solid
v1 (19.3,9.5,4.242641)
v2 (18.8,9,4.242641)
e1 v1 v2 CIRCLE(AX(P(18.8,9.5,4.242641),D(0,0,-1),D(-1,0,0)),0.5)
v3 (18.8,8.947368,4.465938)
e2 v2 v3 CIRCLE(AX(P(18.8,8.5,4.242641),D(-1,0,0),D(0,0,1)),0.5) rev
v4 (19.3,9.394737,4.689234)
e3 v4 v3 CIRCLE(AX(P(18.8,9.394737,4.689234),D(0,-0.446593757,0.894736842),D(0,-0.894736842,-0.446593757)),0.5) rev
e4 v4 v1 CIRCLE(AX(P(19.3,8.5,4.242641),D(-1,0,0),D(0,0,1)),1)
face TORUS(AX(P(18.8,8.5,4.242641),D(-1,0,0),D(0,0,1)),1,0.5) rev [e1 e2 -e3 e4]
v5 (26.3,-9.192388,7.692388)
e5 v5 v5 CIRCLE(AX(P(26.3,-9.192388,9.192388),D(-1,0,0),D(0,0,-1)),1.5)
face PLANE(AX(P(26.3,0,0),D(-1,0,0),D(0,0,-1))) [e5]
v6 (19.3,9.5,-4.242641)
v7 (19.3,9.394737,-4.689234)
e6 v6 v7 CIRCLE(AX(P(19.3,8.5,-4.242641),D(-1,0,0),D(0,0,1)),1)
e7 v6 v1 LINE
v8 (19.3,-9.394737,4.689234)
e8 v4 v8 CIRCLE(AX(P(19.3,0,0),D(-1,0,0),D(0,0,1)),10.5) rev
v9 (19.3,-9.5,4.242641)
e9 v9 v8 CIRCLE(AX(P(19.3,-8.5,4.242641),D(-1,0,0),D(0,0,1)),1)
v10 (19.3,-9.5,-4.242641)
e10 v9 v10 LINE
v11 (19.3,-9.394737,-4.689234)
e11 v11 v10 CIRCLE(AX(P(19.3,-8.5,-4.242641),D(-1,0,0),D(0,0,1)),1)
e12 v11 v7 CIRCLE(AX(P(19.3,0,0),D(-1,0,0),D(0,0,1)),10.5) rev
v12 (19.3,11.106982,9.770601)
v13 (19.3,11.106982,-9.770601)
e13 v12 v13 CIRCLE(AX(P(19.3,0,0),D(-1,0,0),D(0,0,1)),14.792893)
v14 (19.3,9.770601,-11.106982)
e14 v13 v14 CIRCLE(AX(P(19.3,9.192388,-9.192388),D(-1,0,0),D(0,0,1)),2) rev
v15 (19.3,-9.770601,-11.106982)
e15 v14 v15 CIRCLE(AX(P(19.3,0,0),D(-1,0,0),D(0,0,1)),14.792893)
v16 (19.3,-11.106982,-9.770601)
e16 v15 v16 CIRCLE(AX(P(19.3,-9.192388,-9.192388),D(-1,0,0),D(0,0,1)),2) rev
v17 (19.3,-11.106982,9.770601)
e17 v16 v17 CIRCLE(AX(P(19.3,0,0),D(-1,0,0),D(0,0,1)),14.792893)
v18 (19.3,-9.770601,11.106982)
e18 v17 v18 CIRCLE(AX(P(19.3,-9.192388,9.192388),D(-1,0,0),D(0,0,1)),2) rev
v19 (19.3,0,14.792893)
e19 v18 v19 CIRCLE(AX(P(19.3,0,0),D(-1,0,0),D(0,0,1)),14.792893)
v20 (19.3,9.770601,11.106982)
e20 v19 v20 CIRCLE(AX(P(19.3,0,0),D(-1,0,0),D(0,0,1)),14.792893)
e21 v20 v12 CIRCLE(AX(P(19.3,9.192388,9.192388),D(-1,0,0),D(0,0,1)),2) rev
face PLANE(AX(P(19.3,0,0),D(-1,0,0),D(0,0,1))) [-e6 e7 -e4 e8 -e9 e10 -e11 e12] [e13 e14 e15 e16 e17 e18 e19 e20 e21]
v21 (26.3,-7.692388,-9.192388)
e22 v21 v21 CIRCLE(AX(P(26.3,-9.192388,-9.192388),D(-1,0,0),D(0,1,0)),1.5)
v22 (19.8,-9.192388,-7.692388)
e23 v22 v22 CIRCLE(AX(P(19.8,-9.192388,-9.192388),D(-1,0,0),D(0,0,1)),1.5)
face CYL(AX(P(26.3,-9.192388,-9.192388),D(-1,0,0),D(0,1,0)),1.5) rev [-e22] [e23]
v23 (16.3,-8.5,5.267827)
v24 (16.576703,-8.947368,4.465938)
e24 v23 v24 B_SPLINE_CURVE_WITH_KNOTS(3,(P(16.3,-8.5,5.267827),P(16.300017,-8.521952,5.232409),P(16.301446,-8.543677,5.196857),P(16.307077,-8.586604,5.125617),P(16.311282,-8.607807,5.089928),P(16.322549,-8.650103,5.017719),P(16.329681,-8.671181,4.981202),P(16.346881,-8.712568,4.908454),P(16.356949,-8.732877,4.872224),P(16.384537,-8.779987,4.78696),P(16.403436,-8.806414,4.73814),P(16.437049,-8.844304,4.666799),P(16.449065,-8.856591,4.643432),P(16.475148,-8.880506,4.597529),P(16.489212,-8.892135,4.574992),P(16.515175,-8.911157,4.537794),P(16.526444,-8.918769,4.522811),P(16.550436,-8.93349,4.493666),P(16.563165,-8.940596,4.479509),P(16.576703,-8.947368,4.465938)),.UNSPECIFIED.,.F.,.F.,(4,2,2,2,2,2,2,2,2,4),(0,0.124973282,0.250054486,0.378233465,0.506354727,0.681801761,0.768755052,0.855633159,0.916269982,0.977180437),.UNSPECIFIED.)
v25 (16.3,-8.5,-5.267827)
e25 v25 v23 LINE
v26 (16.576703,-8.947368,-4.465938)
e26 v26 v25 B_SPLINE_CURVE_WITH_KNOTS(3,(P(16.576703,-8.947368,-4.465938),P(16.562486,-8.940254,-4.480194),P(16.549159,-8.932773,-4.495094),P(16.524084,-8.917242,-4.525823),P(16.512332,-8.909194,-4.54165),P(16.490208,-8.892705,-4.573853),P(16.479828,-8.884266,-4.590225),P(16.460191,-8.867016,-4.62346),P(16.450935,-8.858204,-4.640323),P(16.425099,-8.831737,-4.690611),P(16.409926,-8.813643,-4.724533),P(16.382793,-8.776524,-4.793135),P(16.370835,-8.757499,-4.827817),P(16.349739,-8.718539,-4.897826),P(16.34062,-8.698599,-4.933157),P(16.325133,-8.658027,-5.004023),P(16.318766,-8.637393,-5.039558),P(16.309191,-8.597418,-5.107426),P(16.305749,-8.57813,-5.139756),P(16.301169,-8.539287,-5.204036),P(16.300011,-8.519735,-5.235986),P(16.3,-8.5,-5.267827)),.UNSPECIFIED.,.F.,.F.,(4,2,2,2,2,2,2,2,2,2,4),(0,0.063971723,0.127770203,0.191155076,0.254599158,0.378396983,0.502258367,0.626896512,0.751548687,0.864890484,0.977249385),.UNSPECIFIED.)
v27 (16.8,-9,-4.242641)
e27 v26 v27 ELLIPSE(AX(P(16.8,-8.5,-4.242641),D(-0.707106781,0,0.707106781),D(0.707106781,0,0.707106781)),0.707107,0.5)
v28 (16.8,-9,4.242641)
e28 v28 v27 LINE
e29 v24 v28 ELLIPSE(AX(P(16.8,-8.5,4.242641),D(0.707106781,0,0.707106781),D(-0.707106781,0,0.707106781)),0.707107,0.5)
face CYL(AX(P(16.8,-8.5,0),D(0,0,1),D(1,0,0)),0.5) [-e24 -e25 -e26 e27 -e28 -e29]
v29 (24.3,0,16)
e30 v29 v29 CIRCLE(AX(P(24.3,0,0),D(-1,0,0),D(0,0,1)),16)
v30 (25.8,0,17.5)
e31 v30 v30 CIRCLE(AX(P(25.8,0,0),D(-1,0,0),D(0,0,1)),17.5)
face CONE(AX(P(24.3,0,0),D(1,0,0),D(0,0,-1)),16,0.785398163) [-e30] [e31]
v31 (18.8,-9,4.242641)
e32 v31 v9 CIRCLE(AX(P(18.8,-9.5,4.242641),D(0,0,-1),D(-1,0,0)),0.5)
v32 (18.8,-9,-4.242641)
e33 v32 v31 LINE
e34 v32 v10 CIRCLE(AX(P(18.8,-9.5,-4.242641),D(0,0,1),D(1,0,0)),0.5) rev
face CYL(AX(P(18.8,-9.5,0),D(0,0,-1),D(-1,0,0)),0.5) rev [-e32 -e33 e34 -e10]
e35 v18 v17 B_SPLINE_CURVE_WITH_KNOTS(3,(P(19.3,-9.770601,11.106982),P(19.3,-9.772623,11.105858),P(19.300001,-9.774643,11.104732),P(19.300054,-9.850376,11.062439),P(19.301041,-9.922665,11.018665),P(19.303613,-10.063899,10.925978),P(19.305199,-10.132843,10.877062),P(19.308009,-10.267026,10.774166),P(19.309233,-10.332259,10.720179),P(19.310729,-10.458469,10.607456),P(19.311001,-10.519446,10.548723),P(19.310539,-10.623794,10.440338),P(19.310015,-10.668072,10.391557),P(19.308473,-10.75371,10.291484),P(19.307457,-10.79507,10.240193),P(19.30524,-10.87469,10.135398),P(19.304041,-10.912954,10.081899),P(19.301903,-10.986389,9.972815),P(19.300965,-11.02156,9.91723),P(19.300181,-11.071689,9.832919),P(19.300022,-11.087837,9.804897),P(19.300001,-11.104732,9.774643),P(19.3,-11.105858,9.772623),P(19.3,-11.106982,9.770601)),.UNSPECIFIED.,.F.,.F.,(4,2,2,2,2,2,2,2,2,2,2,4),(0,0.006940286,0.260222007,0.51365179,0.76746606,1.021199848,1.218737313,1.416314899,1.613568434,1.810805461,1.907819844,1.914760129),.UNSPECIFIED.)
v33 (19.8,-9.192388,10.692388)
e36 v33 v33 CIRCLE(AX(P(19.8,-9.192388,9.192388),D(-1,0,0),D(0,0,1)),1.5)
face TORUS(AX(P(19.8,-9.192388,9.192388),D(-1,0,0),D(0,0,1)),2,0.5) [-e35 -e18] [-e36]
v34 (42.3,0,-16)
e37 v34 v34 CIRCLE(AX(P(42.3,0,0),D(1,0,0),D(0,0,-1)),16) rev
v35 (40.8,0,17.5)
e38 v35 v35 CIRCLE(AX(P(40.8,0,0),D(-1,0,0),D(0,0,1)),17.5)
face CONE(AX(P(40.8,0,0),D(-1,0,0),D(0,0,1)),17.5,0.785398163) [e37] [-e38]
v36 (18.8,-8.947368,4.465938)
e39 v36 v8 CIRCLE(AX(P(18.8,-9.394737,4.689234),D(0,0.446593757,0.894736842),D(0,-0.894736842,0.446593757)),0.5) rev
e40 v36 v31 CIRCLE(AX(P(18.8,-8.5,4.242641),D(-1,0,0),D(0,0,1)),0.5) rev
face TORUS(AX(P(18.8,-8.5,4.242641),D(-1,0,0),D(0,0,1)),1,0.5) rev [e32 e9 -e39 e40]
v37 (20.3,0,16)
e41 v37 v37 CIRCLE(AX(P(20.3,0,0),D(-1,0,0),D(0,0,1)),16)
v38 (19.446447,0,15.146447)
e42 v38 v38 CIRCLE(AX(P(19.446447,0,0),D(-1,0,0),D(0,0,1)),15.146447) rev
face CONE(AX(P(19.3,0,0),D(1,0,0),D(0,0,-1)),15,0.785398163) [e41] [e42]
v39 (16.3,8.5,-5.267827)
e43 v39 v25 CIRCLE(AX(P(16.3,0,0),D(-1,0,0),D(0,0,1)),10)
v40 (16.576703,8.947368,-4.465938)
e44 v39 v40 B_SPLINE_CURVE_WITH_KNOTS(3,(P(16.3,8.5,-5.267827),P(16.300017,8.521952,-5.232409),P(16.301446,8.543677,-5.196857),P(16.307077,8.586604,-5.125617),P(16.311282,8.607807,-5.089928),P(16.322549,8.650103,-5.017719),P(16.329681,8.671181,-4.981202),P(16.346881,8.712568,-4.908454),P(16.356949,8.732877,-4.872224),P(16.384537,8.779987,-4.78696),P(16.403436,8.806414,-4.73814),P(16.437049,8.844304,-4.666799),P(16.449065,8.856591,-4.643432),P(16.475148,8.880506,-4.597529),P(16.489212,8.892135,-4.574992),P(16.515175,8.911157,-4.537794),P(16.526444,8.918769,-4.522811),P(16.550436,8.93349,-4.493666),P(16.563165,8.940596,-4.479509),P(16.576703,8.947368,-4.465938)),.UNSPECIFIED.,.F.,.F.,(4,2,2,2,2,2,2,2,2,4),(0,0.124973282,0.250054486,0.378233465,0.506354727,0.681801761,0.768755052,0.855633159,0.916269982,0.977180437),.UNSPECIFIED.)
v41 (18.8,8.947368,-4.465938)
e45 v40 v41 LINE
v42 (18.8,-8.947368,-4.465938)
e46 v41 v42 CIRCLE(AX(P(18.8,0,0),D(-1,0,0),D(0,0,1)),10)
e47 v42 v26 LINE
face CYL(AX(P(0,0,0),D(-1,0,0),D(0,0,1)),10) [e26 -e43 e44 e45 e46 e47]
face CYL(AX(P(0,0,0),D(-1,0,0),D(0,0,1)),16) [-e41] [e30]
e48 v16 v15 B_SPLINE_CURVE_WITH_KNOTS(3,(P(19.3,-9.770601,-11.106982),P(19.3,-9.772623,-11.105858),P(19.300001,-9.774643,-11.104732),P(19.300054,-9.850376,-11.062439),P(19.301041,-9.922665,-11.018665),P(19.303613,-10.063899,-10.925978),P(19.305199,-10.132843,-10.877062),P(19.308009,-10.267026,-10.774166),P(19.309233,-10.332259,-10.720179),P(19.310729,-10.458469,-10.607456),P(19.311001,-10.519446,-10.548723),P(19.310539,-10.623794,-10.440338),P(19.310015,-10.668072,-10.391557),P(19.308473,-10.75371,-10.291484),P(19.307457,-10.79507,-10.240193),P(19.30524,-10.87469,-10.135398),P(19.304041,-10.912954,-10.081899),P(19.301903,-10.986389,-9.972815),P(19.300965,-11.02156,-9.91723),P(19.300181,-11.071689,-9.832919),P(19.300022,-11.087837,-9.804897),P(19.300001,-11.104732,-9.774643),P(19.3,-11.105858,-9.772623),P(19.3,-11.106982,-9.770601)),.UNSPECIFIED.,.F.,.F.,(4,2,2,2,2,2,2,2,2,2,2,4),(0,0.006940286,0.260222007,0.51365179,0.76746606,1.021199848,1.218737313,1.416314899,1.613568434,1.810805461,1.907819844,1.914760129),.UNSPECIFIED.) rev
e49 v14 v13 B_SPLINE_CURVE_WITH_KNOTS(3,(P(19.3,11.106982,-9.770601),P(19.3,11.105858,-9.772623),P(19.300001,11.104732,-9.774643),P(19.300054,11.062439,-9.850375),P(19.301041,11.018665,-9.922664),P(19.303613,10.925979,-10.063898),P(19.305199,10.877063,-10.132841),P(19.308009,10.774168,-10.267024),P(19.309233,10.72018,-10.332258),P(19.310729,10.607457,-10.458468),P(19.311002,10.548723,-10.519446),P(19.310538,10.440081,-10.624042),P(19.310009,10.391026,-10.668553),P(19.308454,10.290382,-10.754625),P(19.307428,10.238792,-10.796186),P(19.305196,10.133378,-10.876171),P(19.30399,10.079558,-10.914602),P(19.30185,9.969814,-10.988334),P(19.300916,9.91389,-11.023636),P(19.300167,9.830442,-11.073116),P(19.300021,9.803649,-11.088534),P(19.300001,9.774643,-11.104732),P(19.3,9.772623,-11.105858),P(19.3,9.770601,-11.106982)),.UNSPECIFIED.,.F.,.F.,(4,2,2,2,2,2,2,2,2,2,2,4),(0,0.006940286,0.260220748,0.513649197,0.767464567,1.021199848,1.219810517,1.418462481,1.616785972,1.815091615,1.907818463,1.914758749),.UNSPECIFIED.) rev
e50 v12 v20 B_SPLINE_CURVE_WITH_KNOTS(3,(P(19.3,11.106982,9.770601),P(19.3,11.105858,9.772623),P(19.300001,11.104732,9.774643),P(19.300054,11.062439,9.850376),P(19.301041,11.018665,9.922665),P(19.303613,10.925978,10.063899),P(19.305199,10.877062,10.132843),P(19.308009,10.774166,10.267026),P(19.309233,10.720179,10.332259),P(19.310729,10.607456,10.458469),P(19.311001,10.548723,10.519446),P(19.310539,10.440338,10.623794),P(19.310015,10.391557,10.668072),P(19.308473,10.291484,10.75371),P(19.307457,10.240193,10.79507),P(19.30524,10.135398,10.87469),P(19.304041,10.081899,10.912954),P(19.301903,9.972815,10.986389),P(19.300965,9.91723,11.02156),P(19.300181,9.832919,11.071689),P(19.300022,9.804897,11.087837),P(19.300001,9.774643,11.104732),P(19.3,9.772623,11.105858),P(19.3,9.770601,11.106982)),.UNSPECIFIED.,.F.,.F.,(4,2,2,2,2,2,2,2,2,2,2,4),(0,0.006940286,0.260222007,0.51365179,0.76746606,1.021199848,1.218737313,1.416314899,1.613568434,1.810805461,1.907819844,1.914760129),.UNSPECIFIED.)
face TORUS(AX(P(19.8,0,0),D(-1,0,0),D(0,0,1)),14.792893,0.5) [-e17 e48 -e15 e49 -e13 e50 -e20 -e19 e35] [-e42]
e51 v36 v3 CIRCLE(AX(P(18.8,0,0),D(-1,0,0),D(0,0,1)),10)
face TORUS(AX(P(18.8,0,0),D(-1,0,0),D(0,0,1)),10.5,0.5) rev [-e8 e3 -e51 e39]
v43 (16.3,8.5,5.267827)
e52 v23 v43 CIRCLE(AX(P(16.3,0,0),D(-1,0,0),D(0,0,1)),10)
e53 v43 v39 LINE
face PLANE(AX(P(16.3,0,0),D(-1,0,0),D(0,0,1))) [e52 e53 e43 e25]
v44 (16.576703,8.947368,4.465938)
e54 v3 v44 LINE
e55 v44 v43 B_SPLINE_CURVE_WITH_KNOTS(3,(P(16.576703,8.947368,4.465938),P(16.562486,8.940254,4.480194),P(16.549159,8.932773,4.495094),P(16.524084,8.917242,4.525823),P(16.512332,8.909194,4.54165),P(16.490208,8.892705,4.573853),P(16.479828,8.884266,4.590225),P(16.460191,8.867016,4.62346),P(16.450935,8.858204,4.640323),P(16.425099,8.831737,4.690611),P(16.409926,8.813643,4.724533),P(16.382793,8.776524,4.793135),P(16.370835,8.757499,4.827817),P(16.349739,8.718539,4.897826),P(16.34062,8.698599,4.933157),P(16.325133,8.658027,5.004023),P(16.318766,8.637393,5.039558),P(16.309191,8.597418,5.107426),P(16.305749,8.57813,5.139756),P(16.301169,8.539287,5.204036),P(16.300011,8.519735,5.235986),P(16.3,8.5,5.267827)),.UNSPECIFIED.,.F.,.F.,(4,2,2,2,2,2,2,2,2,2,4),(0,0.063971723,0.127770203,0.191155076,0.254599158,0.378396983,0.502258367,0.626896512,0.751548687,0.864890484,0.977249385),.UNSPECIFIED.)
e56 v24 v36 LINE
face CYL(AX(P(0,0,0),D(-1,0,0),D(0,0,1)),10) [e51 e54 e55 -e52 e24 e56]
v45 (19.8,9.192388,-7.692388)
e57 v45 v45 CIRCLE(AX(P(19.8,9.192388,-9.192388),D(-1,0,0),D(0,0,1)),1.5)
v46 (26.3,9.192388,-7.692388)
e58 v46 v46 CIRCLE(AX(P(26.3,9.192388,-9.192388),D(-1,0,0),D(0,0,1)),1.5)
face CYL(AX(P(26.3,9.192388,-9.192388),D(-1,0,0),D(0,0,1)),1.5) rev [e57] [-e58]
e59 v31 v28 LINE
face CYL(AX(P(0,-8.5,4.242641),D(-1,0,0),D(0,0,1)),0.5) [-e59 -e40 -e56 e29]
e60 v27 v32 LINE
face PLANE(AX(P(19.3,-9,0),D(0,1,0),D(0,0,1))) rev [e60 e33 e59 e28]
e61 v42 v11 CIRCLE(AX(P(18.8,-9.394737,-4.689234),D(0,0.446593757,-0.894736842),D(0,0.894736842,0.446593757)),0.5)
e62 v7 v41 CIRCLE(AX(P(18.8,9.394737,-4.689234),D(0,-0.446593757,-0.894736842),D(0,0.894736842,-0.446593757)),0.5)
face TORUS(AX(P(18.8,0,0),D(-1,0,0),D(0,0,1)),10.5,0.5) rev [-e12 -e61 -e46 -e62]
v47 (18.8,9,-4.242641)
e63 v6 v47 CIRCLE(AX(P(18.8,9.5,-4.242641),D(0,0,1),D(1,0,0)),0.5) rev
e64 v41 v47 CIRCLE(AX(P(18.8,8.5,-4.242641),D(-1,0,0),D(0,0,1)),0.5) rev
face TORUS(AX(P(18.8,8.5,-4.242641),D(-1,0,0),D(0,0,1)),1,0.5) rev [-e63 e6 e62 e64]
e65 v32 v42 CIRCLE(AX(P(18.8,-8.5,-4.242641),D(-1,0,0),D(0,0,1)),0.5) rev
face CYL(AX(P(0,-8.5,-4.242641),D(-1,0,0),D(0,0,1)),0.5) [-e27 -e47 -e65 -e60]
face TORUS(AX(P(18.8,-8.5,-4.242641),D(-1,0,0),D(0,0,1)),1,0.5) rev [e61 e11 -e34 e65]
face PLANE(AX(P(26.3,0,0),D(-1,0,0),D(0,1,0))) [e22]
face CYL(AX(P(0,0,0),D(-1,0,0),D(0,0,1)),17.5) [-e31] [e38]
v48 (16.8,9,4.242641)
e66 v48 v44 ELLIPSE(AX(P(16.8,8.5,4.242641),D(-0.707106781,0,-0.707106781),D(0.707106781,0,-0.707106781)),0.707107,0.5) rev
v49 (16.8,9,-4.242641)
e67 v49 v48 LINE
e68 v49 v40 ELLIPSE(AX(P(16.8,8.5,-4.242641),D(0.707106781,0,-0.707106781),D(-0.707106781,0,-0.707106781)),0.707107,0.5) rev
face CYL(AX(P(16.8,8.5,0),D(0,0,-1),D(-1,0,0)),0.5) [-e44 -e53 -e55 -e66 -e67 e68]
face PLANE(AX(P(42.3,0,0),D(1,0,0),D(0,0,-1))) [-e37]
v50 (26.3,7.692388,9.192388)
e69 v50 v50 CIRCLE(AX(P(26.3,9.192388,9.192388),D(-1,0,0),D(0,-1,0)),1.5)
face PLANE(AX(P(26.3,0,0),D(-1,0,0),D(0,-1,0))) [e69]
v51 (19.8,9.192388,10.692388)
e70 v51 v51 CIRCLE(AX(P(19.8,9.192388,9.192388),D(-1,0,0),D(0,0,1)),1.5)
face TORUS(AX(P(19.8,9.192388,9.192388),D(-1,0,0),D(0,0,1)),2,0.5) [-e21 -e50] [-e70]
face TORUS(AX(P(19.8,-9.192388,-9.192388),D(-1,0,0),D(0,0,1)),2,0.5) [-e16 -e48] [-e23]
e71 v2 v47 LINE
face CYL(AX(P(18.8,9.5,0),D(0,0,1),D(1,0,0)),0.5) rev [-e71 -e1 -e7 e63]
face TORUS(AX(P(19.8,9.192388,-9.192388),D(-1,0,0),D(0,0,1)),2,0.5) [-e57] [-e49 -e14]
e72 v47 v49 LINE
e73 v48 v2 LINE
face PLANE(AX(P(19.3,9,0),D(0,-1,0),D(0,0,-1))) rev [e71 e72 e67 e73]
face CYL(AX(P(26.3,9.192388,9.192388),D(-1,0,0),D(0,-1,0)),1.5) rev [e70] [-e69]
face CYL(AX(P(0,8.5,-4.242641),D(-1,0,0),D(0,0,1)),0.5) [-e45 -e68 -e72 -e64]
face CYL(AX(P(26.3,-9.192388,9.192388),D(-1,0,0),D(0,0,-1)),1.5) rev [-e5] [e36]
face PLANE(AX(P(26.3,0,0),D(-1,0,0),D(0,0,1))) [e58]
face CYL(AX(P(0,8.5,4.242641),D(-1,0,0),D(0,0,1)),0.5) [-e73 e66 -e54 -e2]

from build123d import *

# Parameters (mm, degrees)
SKETCH_1_W               = 16.3
SKETCH_1_H               = 3
SKETCH_1_W_2             = 5
SKETCH_1_H_2             = 16
SKETCH_19_W              = 3
SKETCH_19_H              = 0.05
EXTRUDE_START            = 14
SKETCH_20_R              = 18
EXTRUDE_2_DEPTH          = 14
CUT_EXTRUDE_6_DEPTH      = 3
CUT_EXTRUDE_4_DEPTH      = 12
SKETCH_13_R              = 1.5
CUT_EXTRUDE_8_DEPTH      = 7
PATTERN_CIRCULAR_2_COUNT = 4
FILLET_1_R               = 0.5
SKETCH_21_R              = 20
CUT_EXTRUDE_7_DEPTH      = 76
SKETCH_23_R              = 3
CUT_EXTRUDE_8_2_DEPTH    = 16.3


with BuildPart() as part:
    # Эскиз1 → Повернуть1 основной корпус (revolve)
    with BuildSketch(Plane(origin=(0, 0, 0), x_dir=(1, 0, 0), z_dir=(0, 1, 0)), mode=Mode.PRIVATE) as revolve_1_sk:
        with Locations((8.15, 1.5)):
            Rectangle(SKETCH_1_W, SKETCH_1_H)
        Polygon((16.3, 0), (19.3, 0), (19.3, 10), (16.3, 10), (16.3, 3), align=None)
        Polygon((24.3, 0), (24.3, 16), (20.3, 16), (19.3, 15), (19.3, 10), (19.3, 0), align=None)
        Polygon((40.8, 17.5), (42.3, 16), (42.3, 0), (24.3, 0), (24.3, 16), (25.8, 17.5), align=None)
        with Locations((44.8, 8)):
            Rectangle(SKETCH_1_W_2, SKETCH_1_H_2)
        with BuildLine():
            ThreePointArc((47.3, 16), (47.885786438, 17.414213562), (49.3, 18))
            Line((49.3, 18), (104.3, 18))
            Line((104.3, 18), (104.3, 0))
            Line((104.3, 0), (47.3, 0))
            Line((47.3, 0), (47.3, 16))
        make_face()
    revolve(revolve_1_sk.sketch.rotate(Axis((0, 0, 0), (1, 0, 0)), 180), axis=Axis((0, 0, 0), (1, 0, 0)))

    # Эскиз19 → Вырез-Повернуть2 пластиковая часть (revolve, cut)
    with BuildSketch(Plane(origin=(0, 0, 0), x_dir=(1, 0, 0), z_dir=(0, 1, 0)), mode=Mode.PRIVATE) as cut_revolve_2_sk:
        with Locations((102.8, 17.975)):
            Rectangle(SKETCH_19_W, SKETCH_19_H)
    revolve(cut_revolve_2_sk.sketch.rotate(Axis((103.004702911, 0, 0), (-1, 0, 0)), 180), axis=Axis((103.004702911, 0, 0), (-1, 0, 0)), mode=Mode.SUBTRACT)

    # Эскиз20 → Бобышка-Вытянуть2 пластиковая крышка контактов (add)
    with BuildSketch(Plane(origin=(104.3, 0, 0), x_dir=(0, 0, -1), z_dir=(1, 0, 0)).offset(EXTRUDE_START)):
        with Locations(Location((0, 0, 0), (0, 0, 180))):
            Circle(SKETCH_20_R)
    extrude(amount=-EXTRUDE_2_DEPTH)

    # Эскиз11 → Вырез-Вытянуть6 (cut)
    with BuildSketch(Plane.ZY.offset(-16.3)):
        with BuildLine():
            ThreePointArc((4.358898944, 9), (0, 10), (-4.358898944, 9))
            Line((-4.358898944, 9), (4.358898944, 9))
        make_face()
        with BuildLine():
            Line((4.358898944, -9), (-4.358898944, -9))
            ThreePointArc((-4.358898944, -9), (0, -10), (4.358898944, -9))
        make_face()
    extrude(amount=-CUT_EXTRUDE_6_DEPTH, mode=Mode.SUBTRACT)

    # Эскиз6 → Вырез-Вытянуть4 на оси (cut)
    with BuildSketch(Plane.ZY):
        with BuildLine():
            Line((-1.75306936, 2.434491286), (1.561110291, 2.561822527))
            ThreePointArc((1.561110291, 2.561822527), (-0.115175441, 2.997788288), (-1.75306936, 2.434491286))
        make_face()
    extrude(amount=-CUT_EXTRUDE_4_DEPTH, mode=Mode.SUBTRACT)

    # Эскиз13 → Cut-Extrude 8 (cut)
    with BuildSketch(Plane.ZY.offset(-19.3)):
        with Locations((-9.192388155, 9.192388155)):
            Circle(SKETCH_13_R)
    cut_extrude_8 = extrude(amount=-CUT_EXTRUDE_8_DEPTH, mode=Mode.SUBTRACT)

    # Круговой массив2 для винтов: Cut-Extrude 8 ×4 about axis
    pattern_circular_2_axis = Axis((0, 0, 0), (1, 0, 0))
    for i in range(1, PATTERN_CIRCULAR_2_COUNT):
        add(cut_extrude_8.rotate(pattern_circular_2_axis, i * 360 / PATTERN_CIRCULAR_2_COUNT), mode=Mode.SUBTRACT)

    # Скругление1
    # the kernel refuses this fillet: 0.5 mm, written as the material it takes off along each edge
    with BuildSketch(Plane(origin=(19.3, 0, 0), x_dir=(0, 0, 1), z_dir=(0, 1, 0))) as fillet_1_piece_1:
        with BuildLine():
            CenterArc((15 - FILLET_1_R * 0.414213562373, FILLET_1_R), FILLET_1_R, 270, 45)
            Line((15 - FILLET_1_R * 0.414213562373, 0), (15, 0))
            Line((15, 0), (15 + FILLET_1_R * 0.292893218813, FILLET_1_R * 0.292893218813))
        make_face()
    revolve(axis=Axis((19.3, 0, 0), (1, 0, 0)), mode=Mode.SUBTRACT)
    with BuildSketch(Plane(origin=(118.3, 0, 0), x_dir=(0, 0, 1), z_dir=(0, 1, 0))) as fillet_1_piece_2:
        with BuildLine():
            CenterArc((18 - FILLET_1_R, -FILLET_1_R), FILLET_1_R, 0, 90)
            Line((18 - FILLET_1_R, 0), (18, 0))
            Line((18, 0), (18, -FILLET_1_R))
        make_face()
    revolve(axis=Axis((118.3, 0, 0), (1, 0, 0)), mode=Mode.SUBTRACT)
    with BuildSketch(Plane(origin=(16.001803864, 9, -4.358898944), x_dir=(0, 0, 1), z_dir=(1, 0, 0))) as fillet_1_piece_3:
        with BuildLine():
            CenterArc((0.116258256, 0.5), FILLET_1_R, 243.474647983, 26.525352017)
            ThreePointArc((-0.107038622, 0.052631579), (-0.053597784, 0.026156196), (0, 0))
            Line((0, 0), (0.116258256, 0))
        make_face()
    extrude(amount=3.298196136, mode=Mode.SUBTRACT)
    with BuildSketch(Plane(origin=(16.001803864, 9, 4.358898944), x_dir=(0, -0.4412496727830022, 0.8973843804462464), z_dir=(1, 0, 0))) as fillet_1_piece_4:
        with BuildLine():
            CenterArc((0.116296493, 0.499991108), FILLET_1_R, 243.81635761, 26.525352017)
            Line((-0.104328343, 0.051298918), (0, 0))
            ThreePointArc((0, 0), (0.059639227, -0.000177843), (0.119278454, 0))
        make_face()
    extrude(amount=3.298196136, mode=Mode.SUBTRACT)
    with BuildSketch(Plane(origin=(16.3, 9, -5.608898944), x_dir=(1, 0, 0), z_dir=(0, 0, 1)), Plane(origin=(16.3, -9, 5.608898944), x_dir=(1, 0, 0), z_dir=(0, 0, -1))) as fillet_1_piece_5:
        with BuildLine():
            CenterArc((FILLET_1_R, -FILLET_1_R), FILLET_1_R, 90, 90)
            Line((0, -FILLET_1_R), (0, 0))
            Line((0, 0), (FILLET_1_R, 0))
        make_face()
    extrude(amount=11.217797887, mode=Mode.SUBTRACT)
    with BuildSketch(Plane(origin=(16.001803864, -9, 4.358898944), x_dir=(0, 0.4412496727830018, 0.8973843804462466), z_dir=(1, 0, 0))) as fillet_1_piece_6:
        with BuildLine():
            CenterArc((0.116296493, -0.499991108), FILLET_1_R, 89.658290373, 26.525352017)
            Line((-0.104328343, -0.051298918), (0, 0))
            ThreePointArc((0, 0), (0.059639227, 0.000177843), (0.119278454, 0))
        make_face()
    extrude(amount=3.298196136, mode=Mode.SUBTRACT)
    with BuildSketch(Plane(origin=(16.001803864, -9, -4.358898944), x_dir=(0, 0, 1), z_dir=(1, 0, 0))) as fillet_1_piece_7:
        with BuildLine():
            CenterArc((0.116258256, -0.5), FILLET_1_R, 90, 26.525352017)
            ThreePointArc((-0.107038622, -0.052631579), (-0.053597784, -0.026156196), (0, 0))
            Line((0, 0), (0.116258256, 0))
        make_face()
    extrude(amount=3.298196136, mode=Mode.SUBTRACT)
    with BuildSketch(Plane(origin=(19.3, 9.192388155, -9.192388155), x_dir=(0, 0, 1), z_dir=(0, -1, 0))) as fillet_1_piece_8:
        with BuildLine():
            CenterArc((1.5 + FILLET_1_R, -FILLET_1_R), FILLET_1_R, 90, 90)
            Line((1.5, -FILLET_1_R), (1.5, 0))
            Line((1.5, 0), (1.5 + FILLET_1_R, 0))
        make_face()
    revolve(axis=Axis((19.3, 9.192388155, -9.192388155), (-1, 0, 0)), mode=Mode.SUBTRACT)
    with BuildSketch(Plane(origin=(19.3, -9.192388155, -9.192388155), x_dir=(0, 1, 0), z_dir=(0, 0, 1))) as fillet_1_piece_9:
        with BuildLine():
            CenterArc((1.5 + FILLET_1_R, -FILLET_1_R), FILLET_1_R, 90, 90)
            Line((1.5, -FILLET_1_R), (1.5, 0))
            Line((1.5, 0), (1.5 + FILLET_1_R, 0))
        make_face()
    revolve(axis=Axis((19.3, -9.192388155, -9.192388155), (-1, 0, 0)), mode=Mode.SUBTRACT)
    with BuildSketch(Plane(origin=(19.3, -9.192388155, 9.192388155), x_dir=(0, 0, -1), z_dir=(0, 1, 0))) as fillet_1_piece_10:
        with BuildLine():
            CenterArc((1.5 + FILLET_1_R, -FILLET_1_R), FILLET_1_R, 90, 90)
            Line((1.5, -FILLET_1_R), (1.5, 0))
            Line((1.5, 0), (1.5 + FILLET_1_R, 0))
        make_face()
    revolve(axis=Axis((19.3, -9.192388155, 9.192388155), (-1, 0, 0)), mode=Mode.SUBTRACT)
    with BuildSketch(Plane(origin=(19.3, 9.192388155, 9.192388155), x_dir=(0, -1, 0), z_dir=(0, 0, -1))) as fillet_1_piece_11:
        with BuildLine():
            CenterArc((1.5 + FILLET_1_R, -FILLET_1_R), FILLET_1_R, 90, 90)
            Line((1.5, -FILLET_1_R), (1.5, 0))
            Line((1.5, 0), (1.5 + FILLET_1_R, 0))
        make_face()
    revolve(axis=Axis((19.3, 9.192388155, 9.192388155), (-1, 0, 0)), mode=Mode.SUBTRACT)
    # the kernel refuses this fillet: 0.5 mm, written as the material it adds along each edge
    with BuildSketch(Plane(origin=(19.3, 0, 0), x_dir=(0, -0.8947368421052432, -0.4465937565389121), z_dir=(0, -0.4465937565389121, 0.8947368421052432))) as fillet_1_2_piece_1:
        with BuildLine():
            CenterArc((10 + FILLET_1_R, -FILLET_1_R), FILLET_1_R, 90, 90)
            Line((10, -FILLET_1_R), (10, 0))
            Line((10, 0), (10 + FILLET_1_R, 0))
        make_face()
    revolve(axis=Axis((19.3, 0, 0), (1, 0, 0)), revolution_arc=126.949295967)
    with BuildSketch(Plane(origin=(19.3, 9, -4.242640687), x_dir=(0, 1, 0), z_dir=(0, 0, 1)), Plane(origin=(19.3, -9, 4.242640687), x_dir=(0, -1, 0), z_dir=(0, 0, -1))) as fillet_1_2_piece_2:
        with BuildLine():
            CenterArc((FILLET_1_R, FILLET_1_R), FILLET_1_R, 180, 90)
            Line((0, FILLET_1_R), (0, 0))
            Line((0, 0), (FILLET_1_R, 0))
        make_face()
    extrude(amount=8.485281374)
    with BuildSketch(Plane(origin=(19.3, 0, 0), x_dir=(0, 0.894736842105243, 0.44659375653891253), z_dir=(0, 0.44659375653891253, -0.894736842105243))) as fillet_1_2_piece_3:
        with BuildLine():
            CenterArc((10 + FILLET_1_R, -FILLET_1_R), FILLET_1_R, 90, 90)
            Line((10, -FILLET_1_R), (10, 0))
            Line((10, 0), (10 + FILLET_1_R, 0))
        make_face()
    revolve(axis=Axis((19.3, 0, 0), (1, 0, 0)), revolution_arc=126.949295967)
    with BuildSketch(Plane(origin=(19.3, -8.5, 4.242640687), x_dir=(0, -0.8947368421052433, 0.446593756538912), z_dir=(0, 0.446593756538912, 0.8947368421052433))) as fillet_1_2_piece_4:
        with BuildLine():
            CenterArc((0.5 + FILLET_1_R, -FILLET_1_R), FILLET_1_R, 90, 90)
            Line((0.5, -FILLET_1_R), (0.5, 0))
            Line((0.5, 0), (0.5 + FILLET_1_R, 0))
        make_face()
    revolve(axis=Axis((19.3, -8.5, 4.242640687), (1, 0, 0)), revolution_arc=26.525352017)
    with BuildSketch(Plane(origin=(19.3, -8.5, -4.242640687), x_dir=(0, -1, 0), z_dir=(0, 0, 1))) as fillet_1_2_piece_5:
        with BuildLine():
            CenterArc((0.5 + FILLET_1_R, -FILLET_1_R), FILLET_1_R, 90, 90)
            Line((0.5, -FILLET_1_R), (0.5, 0))
            Line((0.5, 0), (0.5 + FILLET_1_R, 0))
        make_face()
    revolve(axis=Axis((19.3, -8.5, -4.242640687), (1, 0, 0)), revolution_arc=26.525352017)
    with BuildSketch(Plane(origin=(19.3, 8.5, 4.242640687), x_dir=(0, 0.8947368421052433, 0.446593756538912), z_dir=(0, -0.446593756538912, 0.8947368421052433))) as fillet_1_2_piece_6:
        with BuildLine():
            CenterArc((0.5 + FILLET_1_R, FILLET_1_R), FILLET_1_R, 180, 90)
            Line((0.5, FILLET_1_R), (0.5, 0))
            Line((0.5, 0), (0.5 + FILLET_1_R, 0))
        make_face()
    revolve(axis=Axis((19.3, 8.5, 4.242640687), (-1, 0, 0)), revolution_arc=26.525352017)
    with BuildSketch(Plane(origin=(19.3, 8.5, -4.242640687), x_dir=(0, 1, 0), z_dir=(0, 0, 1))) as fillet_1_2_piece_7:
        with BuildLine():
            CenterArc((0.5 + FILLET_1_R, FILLET_1_R), FILLET_1_R, 180, 90)
            Line((0.5, FILLET_1_R), (0.5, 0))
            Line((0.5, 0), (0.5 + FILLET_1_R, 0))
        make_face()
    revolve(axis=Axis((19.3, 8.5, -4.242640687), (-1, 0, 0)), revolution_arc=26.525352017)

    # Эскиз21 → Вырез-Вытянуть7 (cut)
    with BuildSketch(Plane(origin=(118.3, 0, 0), x_dir=(0, 0, -1), z_dir=(1, 0, 0))):
        Circle(SKETCH_21_R)
    extrude(amount=-CUT_EXTRUDE_7_DEPTH, mode=Mode.SUBTRACT)

    # Эскиз23 → Cut-Extrude 8 2 (cut)
    with BuildSketch(Plane.ZY):
        Circle(SKETCH_23_R)
    extrude(amount=-CUT_EXTRUDE_8_2_DEPTH, mode=Mode.SUBTRACT)


solid = part.part
